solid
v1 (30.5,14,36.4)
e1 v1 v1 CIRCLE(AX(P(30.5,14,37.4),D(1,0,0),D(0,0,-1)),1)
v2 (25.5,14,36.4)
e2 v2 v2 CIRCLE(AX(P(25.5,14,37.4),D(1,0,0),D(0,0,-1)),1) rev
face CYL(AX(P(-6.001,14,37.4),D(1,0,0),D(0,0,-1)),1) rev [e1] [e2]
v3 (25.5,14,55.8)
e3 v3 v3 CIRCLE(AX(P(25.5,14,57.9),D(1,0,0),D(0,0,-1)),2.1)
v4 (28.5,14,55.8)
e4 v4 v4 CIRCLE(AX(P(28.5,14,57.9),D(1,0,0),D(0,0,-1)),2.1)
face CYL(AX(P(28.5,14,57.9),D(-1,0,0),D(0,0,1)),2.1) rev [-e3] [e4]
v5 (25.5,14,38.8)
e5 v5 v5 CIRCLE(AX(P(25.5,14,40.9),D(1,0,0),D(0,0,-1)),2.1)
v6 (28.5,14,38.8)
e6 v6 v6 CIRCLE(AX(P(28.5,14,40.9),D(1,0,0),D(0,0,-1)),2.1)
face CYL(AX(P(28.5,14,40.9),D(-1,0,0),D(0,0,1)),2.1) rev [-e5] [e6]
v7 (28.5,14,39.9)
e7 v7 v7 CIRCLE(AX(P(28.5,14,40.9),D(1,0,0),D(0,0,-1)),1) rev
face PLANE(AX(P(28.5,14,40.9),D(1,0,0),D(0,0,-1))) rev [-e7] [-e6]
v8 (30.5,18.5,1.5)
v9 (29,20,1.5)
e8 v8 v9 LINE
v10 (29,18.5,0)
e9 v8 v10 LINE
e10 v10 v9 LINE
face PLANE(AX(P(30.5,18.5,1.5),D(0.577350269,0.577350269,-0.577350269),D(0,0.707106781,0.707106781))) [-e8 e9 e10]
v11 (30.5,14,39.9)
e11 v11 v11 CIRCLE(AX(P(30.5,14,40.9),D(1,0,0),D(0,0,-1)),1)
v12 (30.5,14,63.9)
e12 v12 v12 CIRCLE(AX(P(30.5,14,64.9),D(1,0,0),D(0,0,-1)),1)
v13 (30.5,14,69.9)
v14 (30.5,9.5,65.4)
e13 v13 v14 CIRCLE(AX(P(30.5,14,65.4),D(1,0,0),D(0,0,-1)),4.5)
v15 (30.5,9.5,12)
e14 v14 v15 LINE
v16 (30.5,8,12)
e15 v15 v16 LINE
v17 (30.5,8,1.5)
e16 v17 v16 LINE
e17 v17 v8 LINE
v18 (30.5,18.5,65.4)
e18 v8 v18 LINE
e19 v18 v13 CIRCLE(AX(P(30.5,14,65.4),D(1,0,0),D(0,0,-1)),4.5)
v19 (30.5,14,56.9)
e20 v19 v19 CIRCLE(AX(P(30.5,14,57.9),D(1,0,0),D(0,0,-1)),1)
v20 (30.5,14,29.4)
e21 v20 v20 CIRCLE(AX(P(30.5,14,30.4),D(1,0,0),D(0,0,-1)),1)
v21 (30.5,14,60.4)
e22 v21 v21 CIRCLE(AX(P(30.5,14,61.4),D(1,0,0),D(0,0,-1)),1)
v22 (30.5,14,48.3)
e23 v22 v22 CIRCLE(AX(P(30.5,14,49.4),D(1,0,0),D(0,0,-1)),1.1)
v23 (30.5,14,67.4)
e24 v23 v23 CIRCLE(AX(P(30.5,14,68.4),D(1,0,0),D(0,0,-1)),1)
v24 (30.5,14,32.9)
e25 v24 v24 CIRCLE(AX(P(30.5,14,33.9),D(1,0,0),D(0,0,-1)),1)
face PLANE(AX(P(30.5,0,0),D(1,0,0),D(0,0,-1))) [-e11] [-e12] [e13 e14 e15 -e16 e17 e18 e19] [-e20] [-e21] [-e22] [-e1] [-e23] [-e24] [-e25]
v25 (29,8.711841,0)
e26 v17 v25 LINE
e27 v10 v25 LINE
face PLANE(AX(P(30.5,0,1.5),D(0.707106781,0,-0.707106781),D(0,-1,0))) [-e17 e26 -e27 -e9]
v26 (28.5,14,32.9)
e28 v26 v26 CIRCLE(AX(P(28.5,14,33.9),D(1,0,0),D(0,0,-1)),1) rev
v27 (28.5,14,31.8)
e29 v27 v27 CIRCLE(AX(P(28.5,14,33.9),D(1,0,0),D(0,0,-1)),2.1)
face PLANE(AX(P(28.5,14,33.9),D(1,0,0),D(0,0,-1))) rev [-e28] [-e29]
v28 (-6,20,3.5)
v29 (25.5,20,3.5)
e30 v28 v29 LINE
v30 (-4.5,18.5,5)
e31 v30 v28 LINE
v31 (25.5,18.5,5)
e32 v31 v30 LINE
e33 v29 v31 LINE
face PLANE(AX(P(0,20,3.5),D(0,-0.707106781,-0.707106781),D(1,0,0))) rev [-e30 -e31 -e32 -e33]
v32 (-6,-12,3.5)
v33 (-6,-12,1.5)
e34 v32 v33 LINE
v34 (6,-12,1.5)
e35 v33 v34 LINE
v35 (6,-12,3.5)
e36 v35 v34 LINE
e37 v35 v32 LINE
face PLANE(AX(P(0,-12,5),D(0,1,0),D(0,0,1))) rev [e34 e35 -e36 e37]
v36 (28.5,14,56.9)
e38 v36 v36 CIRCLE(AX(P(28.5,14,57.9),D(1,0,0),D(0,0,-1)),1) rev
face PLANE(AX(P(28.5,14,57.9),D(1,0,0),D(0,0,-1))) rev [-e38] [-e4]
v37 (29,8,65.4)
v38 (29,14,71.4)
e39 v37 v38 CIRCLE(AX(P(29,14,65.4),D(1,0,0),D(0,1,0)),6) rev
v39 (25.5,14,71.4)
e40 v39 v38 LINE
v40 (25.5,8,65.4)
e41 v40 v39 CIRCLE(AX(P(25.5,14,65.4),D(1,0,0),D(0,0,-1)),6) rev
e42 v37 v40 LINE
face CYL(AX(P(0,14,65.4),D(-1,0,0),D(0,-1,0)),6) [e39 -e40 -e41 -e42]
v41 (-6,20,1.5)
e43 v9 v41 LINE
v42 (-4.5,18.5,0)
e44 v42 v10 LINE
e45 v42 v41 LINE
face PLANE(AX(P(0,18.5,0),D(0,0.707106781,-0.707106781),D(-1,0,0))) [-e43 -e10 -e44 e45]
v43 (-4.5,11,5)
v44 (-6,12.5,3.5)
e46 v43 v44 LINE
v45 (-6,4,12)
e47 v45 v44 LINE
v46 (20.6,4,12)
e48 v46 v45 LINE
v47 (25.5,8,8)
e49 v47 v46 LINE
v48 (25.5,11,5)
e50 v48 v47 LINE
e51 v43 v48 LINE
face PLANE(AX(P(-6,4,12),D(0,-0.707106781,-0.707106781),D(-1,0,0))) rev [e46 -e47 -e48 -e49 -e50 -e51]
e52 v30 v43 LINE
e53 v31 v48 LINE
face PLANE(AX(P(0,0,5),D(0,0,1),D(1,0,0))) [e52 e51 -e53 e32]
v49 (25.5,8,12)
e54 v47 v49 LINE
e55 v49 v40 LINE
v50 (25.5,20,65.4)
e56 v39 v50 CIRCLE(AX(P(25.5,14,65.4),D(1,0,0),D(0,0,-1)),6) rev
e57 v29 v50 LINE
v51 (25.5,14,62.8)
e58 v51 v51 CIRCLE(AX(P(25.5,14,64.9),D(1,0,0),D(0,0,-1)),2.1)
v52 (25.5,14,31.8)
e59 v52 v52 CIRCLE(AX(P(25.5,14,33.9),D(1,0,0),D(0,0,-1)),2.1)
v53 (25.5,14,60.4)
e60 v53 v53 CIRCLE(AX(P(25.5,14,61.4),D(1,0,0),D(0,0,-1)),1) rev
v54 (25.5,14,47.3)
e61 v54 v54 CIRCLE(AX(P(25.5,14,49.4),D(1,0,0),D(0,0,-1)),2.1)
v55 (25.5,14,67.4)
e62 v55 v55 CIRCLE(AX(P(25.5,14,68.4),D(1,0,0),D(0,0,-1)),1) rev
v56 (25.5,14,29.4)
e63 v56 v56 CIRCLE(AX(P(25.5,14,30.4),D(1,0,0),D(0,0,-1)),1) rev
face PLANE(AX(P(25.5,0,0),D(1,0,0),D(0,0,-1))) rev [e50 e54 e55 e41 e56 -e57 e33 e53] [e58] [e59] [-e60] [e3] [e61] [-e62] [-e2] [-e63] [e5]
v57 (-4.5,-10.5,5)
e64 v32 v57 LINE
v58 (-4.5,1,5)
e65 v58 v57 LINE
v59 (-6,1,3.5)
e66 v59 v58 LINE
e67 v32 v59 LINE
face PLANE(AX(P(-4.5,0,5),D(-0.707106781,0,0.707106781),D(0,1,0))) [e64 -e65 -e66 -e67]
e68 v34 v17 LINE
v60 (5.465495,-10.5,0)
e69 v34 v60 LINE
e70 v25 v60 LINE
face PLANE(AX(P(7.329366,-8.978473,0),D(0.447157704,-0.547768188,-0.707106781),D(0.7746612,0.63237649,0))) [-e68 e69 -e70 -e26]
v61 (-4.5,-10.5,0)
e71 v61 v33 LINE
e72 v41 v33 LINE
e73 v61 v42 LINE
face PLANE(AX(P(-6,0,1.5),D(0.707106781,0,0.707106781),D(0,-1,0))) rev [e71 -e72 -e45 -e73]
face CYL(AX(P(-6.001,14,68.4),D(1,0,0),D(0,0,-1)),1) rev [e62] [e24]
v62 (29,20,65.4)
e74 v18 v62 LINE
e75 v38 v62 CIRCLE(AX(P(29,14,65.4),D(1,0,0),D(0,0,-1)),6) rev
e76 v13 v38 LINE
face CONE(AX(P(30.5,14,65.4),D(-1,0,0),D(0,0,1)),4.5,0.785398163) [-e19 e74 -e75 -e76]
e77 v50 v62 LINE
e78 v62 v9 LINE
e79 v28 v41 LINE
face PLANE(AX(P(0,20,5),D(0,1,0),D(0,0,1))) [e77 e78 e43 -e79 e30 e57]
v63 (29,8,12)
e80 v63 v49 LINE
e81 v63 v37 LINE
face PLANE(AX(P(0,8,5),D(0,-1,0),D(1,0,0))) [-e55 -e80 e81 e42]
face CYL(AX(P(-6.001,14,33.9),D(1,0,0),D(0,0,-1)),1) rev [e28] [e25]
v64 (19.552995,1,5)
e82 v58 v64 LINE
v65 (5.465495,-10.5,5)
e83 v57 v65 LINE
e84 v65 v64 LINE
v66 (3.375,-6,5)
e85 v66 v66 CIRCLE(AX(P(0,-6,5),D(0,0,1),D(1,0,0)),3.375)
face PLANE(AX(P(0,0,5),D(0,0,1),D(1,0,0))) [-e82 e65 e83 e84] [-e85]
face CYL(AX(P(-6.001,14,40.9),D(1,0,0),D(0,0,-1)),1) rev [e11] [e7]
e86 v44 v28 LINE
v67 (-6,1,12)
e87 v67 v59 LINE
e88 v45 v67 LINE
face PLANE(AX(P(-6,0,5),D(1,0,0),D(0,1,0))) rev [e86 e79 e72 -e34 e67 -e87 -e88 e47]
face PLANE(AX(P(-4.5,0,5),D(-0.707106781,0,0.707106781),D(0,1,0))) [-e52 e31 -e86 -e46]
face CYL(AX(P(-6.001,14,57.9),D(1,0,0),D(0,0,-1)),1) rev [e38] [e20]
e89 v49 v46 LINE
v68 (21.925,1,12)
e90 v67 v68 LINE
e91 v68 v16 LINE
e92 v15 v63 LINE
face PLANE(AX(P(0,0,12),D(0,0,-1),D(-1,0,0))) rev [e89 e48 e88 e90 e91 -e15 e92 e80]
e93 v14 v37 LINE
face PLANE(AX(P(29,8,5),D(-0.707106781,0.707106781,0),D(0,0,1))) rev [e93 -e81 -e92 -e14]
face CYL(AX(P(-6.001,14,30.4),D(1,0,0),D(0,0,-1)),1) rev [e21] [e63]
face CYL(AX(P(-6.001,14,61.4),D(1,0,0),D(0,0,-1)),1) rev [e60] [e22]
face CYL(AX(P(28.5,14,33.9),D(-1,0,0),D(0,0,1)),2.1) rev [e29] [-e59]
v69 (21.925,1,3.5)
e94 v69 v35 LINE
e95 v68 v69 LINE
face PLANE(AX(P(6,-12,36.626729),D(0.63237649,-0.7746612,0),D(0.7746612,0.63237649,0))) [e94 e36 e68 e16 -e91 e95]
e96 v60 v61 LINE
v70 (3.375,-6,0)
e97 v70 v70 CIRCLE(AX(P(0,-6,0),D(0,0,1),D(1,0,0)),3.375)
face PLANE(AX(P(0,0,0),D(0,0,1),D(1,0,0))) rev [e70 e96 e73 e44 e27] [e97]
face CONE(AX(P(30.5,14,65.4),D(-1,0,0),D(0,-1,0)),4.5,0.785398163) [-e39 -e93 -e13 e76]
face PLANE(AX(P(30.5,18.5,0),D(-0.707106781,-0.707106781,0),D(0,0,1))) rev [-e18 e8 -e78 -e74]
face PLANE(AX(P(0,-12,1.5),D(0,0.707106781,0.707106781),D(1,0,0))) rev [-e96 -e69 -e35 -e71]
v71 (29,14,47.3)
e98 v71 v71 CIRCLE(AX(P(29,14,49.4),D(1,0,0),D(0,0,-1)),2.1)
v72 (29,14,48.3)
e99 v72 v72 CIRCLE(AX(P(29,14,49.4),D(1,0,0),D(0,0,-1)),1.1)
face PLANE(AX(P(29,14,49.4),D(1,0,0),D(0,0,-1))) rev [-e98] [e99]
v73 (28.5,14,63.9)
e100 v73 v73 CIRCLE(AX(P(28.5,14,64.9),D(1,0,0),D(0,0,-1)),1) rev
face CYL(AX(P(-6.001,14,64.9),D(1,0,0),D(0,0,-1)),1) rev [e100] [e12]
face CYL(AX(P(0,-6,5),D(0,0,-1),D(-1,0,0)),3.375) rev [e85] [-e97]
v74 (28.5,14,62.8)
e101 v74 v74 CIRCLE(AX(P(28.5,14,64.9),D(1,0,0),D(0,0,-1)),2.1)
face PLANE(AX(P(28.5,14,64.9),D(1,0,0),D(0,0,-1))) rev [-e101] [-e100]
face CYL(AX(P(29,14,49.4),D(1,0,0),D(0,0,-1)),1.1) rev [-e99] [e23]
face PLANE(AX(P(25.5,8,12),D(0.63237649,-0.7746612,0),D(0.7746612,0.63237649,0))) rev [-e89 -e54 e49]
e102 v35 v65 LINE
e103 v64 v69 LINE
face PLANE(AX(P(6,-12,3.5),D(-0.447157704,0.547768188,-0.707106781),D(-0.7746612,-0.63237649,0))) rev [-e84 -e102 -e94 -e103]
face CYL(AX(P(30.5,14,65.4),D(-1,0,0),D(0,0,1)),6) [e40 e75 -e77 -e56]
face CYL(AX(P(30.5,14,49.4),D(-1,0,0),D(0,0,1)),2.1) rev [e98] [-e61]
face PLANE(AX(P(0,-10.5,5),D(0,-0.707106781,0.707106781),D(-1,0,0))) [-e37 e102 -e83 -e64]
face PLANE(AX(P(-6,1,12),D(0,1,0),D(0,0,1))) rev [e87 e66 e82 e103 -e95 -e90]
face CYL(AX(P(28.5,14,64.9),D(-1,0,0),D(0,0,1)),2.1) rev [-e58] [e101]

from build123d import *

# Parameters (mm, degrees)
CROQUIS1_W              = 12
CROQUIS1_H              = 12
CROQUIS1_R              = 3.375
SALIENTE_EXTRUIR1_DEPTH = 5
CROQUIS2_W              = 71.4
CROQUIS2_H              = 12
CROQUIS2_R              = 2.1
SALIENTE_EXTRUIR2_DEPTH = 5
CORTAR_EXTRUIR1_REACH   = 84.645
CROQUIS4_R              = 1
CORTAR_EXTRUIR2_START   = -5
CROQUIS5_R              = 2.1
CORTAR_EXTRUIR2_DEPTH   = 3
SALIENTE_EXTRUIR4_START = -1.5
CROQUIS6_R              = 2.1
CROQUIS6_R_2            = 1.1
SALIENTE_EXTRUIR4_DEPTH = 1.5
REDONDEO2_R             = 6
SALIENTE_EXTRUIR5_DEPTH = 5
SALIENTE_EXTRUIR6_DEPTH = 7
CHAFL_N1_SIZE           = 7
CHAFL_N2_SIZE           = 1.5


# Some blends are built 0.0001 mm under size
with BuildPart() as part:
    # Croquis1 → Saliente-Extruir1 (new body)
    # profile 1 of 2: a face of its own
    with BuildSketch(Plane.XY):
        Polygon((25.5, 20), (-6, 20), (-6, 0), (6, 0), (6, 8), (25.5, 8), align=None)
    # profile 2 of 2: a face of its own
    with BuildSketch(Plane.XY):
        with Locations((0, -6)):
            Rectangle(CROQUIS1_W, CROQUIS1_H)
        with Locations((0, -6)):
            Circle(CROQUIS1_R, mode=Mode.SUBTRACT)
    extrude(amount=SALIENTE_EXTRUIR1_DEPTH)

    # Croquis2 → Saliente-Extruir2 (add)
    with BuildSketch(Plane(origin=(25.5, 0, 0), x_dir=(0, 0, -1), z_dir=(1, 0, 0))):
        with Locations((-35.7, 14)):
            Rectangle(CROQUIS2_W, CROQUIS2_H)
        with Locations((-49.4, 14)):
            Circle(CROQUIS2_R, mode=Mode.SUBTRACT)
    extrude(amount=SALIENTE_EXTRUIR2_DEPTH)

    # Croquis4 → Cortar-Extruir1 (cut, up to next)
    with BuildSketch(Plane(origin=(30.5, 0, 0), x_dir=(0, 0, -1), z_dir=(1, 0, 0)), mode=Mode.PRIVATE) as cortar_extruir1_sk1:
        with Locations((-68.4, 14)):
            Circle(CROQUIS4_R)
    cortar_extruir1_tool1 = extrude(cortar_extruir1_sk1.sketch, amount=-CORTAR_EXTRUIR1_REACH, mode=Mode.PRIVATE) & part.part
    # Croquis4 → Cortar-Extruir1 (cut, up to next)
    with BuildSketch(Plane(origin=(30.5, 0, 0), x_dir=(0, 0, -1), z_dir=(1, 0, 0)), mode=Mode.PRIVATE) as cortar_extruir1_sk2:
        with Locations((-64.9, 14)):
            Circle(CROQUIS4_R)
    cortar_extruir1_tool2 = extrude(cortar_extruir1_sk2.sketch, amount=-CORTAR_EXTRUIR1_REACH, mode=Mode.PRIVATE) & part.part
    # Croquis4 → Cortar-Extruir1 (cut, up to next)
    with BuildSketch(Plane(origin=(30.5, 0, 0), x_dir=(0, 0, -1), z_dir=(1, 0, 0)), mode=Mode.PRIVATE) as cortar_extruir1_sk3:
        with Locations((-61.4, 14)):
            Circle(CROQUIS4_R)
    cortar_extruir1_tool3 = extrude(cortar_extruir1_sk3.sketch, amount=-CORTAR_EXTRUIR1_REACH, mode=Mode.PRIVATE) & part.part
    # Croquis4 → Cortar-Extruir1 (cut, up to next)
    with BuildSketch(Plane(origin=(30.5, 0, 0), x_dir=(0, 0, -1), z_dir=(1, 0, 0)), mode=Mode.PRIVATE) as cortar_extruir1_sk4:
        with Locations((-57.9, 14)):
            Circle(CROQUIS4_R)
    cortar_extruir1_tool4 = extrude(cortar_extruir1_sk4.sketch, amount=-CORTAR_EXTRUIR1_REACH, mode=Mode.PRIVATE) & part.part
    # Croquis4 → Cortar-Extruir1 (cut, up to next)
    with BuildSketch(Plane(origin=(30.5, 0, 0), x_dir=(0, 0, -1), z_dir=(1, 0, 0)), mode=Mode.PRIVATE) as cortar_extruir1_sk5:
        with Locations((-40.9, 14)):
            Circle(CROQUIS4_R)
    cortar_extruir1_tool5 = extrude(cortar_extruir1_sk5.sketch, amount=-CORTAR_EXTRUIR1_REACH, mode=Mode.PRIVATE) & part.part
    # Croquis4 → Cortar-Extruir1 (cut, up to next)
    with BuildSketch(Plane(origin=(30.5, 0, 0), x_dir=(0, 0, -1), z_dir=(1, 0, 0)), mode=Mode.PRIVATE) as cortar_extruir1_sk6:
        with Locations((-37.4, 14)):
            Circle(CROQUIS4_R)
    cortar_extruir1_tool6 = extrude(cortar_extruir1_sk6.sketch, amount=-CORTAR_EXTRUIR1_REACH, mode=Mode.PRIVATE) & part.part
    # Croquis4 → Cortar-Extruir1 (cut, up to next)
    with BuildSketch(Plane(origin=(30.5, 0, 0), x_dir=(0, 0, -1), z_dir=(1, 0, 0)), mode=Mode.PRIVATE) as cortar_extruir1_sk7:
        with Locations((-33.9, 14)):
            Circle(CROQUIS4_R)
    cortar_extruir1_tool7 = extrude(cortar_extruir1_sk7.sketch, amount=-CORTAR_EXTRUIR1_REACH, mode=Mode.PRIVATE) & part.part
    # Croquis4 → Cortar-Extruir1 (cut, up to next)
    with BuildSketch(Plane(origin=(30.5, 0, 0), x_dir=(0, 0, -1), z_dir=(1, 0, 0)), mode=Mode.PRIVATE) as cortar_extruir1_sk8:
        with Locations((-30.4, 14)):
            Circle(CROQUIS4_R)
    cortar_extruir1_tool8 = extrude(cortar_extruir1_sk8.sketch, amount=-CORTAR_EXTRUIR1_REACH, mode=Mode.PRIVATE) & part.part
    add(cortar_extruir1_tool1.solids().sort_by_distance((30.5, 14, 68.4))[0], mode=Mode.SUBTRACT)
    add(cortar_extruir1_tool2.solids().sort_by_distance((30.5, 14, 64.9))[0], mode=Mode.SUBTRACT)
    add(cortar_extruir1_tool3.solids().sort_by_distance((30.5, 14, 61.4))[0], mode=Mode.SUBTRACT)
    add(cortar_extruir1_tool4.solids().sort_by_distance((30.5, 14, 57.9))[0], mode=Mode.SUBTRACT)
    add(cortar_extruir1_tool5.solids().sort_by_distance((30.5, 14, 40.9))[0], mode=Mode.SUBTRACT)
    add(cortar_extruir1_tool6.solids().sort_by_distance((30.5, 14, 37.4))[0], mode=Mode.SUBTRACT)
    add(cortar_extruir1_tool7.solids().sort_by_distance((30.5, 14, 33.9))[0], mode=Mode.SUBTRACT)
    add(cortar_extruir1_tool8.solids().sort_by_distance((30.5, 14, 30.4))[0], mode=Mode.SUBTRACT)

    # Croquis5 → Cortar-Extruir2 (cut)
    with BuildSketch(Plane(origin=(30.5, 0, 0), x_dir=(0, 0, -1), z_dir=(1, 0, 0)).offset(CORTAR_EXTRUIR2_START)):
        with Locations((-57.9, 14)):
            Circle(CROQUIS5_R)
        with Locations((-64.9, 14)):
            Circle(CROQUIS5_R)
        with Locations((-40.9, 14)):
            Circle(CROQUIS5_R)
        with Locations((-33.9, 14)):
            Circle(CROQUIS5_R)
    extrude(amount=CORTAR_EXTRUIR2_DEPTH, mode=Mode.SUBTRACT)

    # Croquis6 → Saliente-Extruir4 (add)
    with BuildSketch(Plane(origin=(30.5, 0, 0), x_dir=(0, 0, -1), z_dir=(1, 0, 0)).offset(SALIENTE_EXTRUIR4_START)):
        with Locations((-49.4, 14)):
            Circle(CROQUIS6_R)
        with Locations((-49.4, 14)):
            Circle(CROQUIS6_R_2, mode=Mode.SUBTRACT)
    extrude(amount=SALIENTE_EXTRUIR4_DEPTH)

    # Redondeo2
    # the kernel refuses this fillet: 6 mm, written as the material it takes off along each edge
    with BuildSketch(Plane(origin=(10.5, 20, 71.4), x_dir=(0, 0, -1), z_dir=(1, 0, 0)), Plane(origin=(10.5, 8, 71.4), x_dir=(0, 1, 0), z_dir=(1, 0, 0))) as redondeo2_piece_1:
        with BuildLine():
            CenterArc((REDONDEO2_R, -REDONDEO2_R), REDONDEO2_R, 90, 90)
            Line((0, -REDONDEO2_R), (0, 0))
            Line((0, 0), (REDONDEO2_R, 0))
        make_face()
    extrude(amount=35, mode=Mode.SUBTRACT)

    # Croquis10 → Saliente-Extruir5 (add)
    with BuildSketch(Plane(origin=(0, 0, 0), x_dir=(-1, 0, 0), z_dir=(0, 0, -1))):
        Polygon((-6, 8), (-6, -12), (-30.5, 8), align=None)
    extrude(amount=-SALIENTE_EXTRUIR5_DEPTH)

    # Croquis11 → Saliente-Extruir6 (add)
    with BuildSketch(Plane.XY.offset(5)):
        Polygon((-6, 1), (21.925, 1), (30.5, 8), (25.5, 8), (20.6, 4), (-6, 4), align=None)
    extrude(amount=SALIENTE_EXTRUIR6_DEPTH)

    # Chaflán1
    chafl_n1_edges = [part.edges().sort_by_distance(p)[0] for p in [
        (7.3, 4, 5),
    ]]
    chamfer(chafl_n1_edges, length=CHAFL_N1_SIZE - 0.0001)  # a hair under: the kernel refuses the full size

    # Chaflán2
    chafl_n2_edges = [part.edges().sort_by_distance(p)[0] for p in [
        (12.25, 20, 0),
        (30.5, 14, 71.4),
        (30.5, 14, 71.4),
        (18.25, -2, 0),
        (13.9625, -5.5, 5),
        (30.5, 8, 38.7),
        (-6, -5.5, 5),
        (9.75, 20, 5),
        (-6, 15.49995, 5),
        (30.5, 14, 0),
        (0, -12, 5),
        (30.5, 20, 32.7),
        (0, -12, 0),
        (-6, 4, 0),
    ]]
    chamfer(chafl_n2_edges, length=CHAFL_N2_SIZE)


solid = part.part
